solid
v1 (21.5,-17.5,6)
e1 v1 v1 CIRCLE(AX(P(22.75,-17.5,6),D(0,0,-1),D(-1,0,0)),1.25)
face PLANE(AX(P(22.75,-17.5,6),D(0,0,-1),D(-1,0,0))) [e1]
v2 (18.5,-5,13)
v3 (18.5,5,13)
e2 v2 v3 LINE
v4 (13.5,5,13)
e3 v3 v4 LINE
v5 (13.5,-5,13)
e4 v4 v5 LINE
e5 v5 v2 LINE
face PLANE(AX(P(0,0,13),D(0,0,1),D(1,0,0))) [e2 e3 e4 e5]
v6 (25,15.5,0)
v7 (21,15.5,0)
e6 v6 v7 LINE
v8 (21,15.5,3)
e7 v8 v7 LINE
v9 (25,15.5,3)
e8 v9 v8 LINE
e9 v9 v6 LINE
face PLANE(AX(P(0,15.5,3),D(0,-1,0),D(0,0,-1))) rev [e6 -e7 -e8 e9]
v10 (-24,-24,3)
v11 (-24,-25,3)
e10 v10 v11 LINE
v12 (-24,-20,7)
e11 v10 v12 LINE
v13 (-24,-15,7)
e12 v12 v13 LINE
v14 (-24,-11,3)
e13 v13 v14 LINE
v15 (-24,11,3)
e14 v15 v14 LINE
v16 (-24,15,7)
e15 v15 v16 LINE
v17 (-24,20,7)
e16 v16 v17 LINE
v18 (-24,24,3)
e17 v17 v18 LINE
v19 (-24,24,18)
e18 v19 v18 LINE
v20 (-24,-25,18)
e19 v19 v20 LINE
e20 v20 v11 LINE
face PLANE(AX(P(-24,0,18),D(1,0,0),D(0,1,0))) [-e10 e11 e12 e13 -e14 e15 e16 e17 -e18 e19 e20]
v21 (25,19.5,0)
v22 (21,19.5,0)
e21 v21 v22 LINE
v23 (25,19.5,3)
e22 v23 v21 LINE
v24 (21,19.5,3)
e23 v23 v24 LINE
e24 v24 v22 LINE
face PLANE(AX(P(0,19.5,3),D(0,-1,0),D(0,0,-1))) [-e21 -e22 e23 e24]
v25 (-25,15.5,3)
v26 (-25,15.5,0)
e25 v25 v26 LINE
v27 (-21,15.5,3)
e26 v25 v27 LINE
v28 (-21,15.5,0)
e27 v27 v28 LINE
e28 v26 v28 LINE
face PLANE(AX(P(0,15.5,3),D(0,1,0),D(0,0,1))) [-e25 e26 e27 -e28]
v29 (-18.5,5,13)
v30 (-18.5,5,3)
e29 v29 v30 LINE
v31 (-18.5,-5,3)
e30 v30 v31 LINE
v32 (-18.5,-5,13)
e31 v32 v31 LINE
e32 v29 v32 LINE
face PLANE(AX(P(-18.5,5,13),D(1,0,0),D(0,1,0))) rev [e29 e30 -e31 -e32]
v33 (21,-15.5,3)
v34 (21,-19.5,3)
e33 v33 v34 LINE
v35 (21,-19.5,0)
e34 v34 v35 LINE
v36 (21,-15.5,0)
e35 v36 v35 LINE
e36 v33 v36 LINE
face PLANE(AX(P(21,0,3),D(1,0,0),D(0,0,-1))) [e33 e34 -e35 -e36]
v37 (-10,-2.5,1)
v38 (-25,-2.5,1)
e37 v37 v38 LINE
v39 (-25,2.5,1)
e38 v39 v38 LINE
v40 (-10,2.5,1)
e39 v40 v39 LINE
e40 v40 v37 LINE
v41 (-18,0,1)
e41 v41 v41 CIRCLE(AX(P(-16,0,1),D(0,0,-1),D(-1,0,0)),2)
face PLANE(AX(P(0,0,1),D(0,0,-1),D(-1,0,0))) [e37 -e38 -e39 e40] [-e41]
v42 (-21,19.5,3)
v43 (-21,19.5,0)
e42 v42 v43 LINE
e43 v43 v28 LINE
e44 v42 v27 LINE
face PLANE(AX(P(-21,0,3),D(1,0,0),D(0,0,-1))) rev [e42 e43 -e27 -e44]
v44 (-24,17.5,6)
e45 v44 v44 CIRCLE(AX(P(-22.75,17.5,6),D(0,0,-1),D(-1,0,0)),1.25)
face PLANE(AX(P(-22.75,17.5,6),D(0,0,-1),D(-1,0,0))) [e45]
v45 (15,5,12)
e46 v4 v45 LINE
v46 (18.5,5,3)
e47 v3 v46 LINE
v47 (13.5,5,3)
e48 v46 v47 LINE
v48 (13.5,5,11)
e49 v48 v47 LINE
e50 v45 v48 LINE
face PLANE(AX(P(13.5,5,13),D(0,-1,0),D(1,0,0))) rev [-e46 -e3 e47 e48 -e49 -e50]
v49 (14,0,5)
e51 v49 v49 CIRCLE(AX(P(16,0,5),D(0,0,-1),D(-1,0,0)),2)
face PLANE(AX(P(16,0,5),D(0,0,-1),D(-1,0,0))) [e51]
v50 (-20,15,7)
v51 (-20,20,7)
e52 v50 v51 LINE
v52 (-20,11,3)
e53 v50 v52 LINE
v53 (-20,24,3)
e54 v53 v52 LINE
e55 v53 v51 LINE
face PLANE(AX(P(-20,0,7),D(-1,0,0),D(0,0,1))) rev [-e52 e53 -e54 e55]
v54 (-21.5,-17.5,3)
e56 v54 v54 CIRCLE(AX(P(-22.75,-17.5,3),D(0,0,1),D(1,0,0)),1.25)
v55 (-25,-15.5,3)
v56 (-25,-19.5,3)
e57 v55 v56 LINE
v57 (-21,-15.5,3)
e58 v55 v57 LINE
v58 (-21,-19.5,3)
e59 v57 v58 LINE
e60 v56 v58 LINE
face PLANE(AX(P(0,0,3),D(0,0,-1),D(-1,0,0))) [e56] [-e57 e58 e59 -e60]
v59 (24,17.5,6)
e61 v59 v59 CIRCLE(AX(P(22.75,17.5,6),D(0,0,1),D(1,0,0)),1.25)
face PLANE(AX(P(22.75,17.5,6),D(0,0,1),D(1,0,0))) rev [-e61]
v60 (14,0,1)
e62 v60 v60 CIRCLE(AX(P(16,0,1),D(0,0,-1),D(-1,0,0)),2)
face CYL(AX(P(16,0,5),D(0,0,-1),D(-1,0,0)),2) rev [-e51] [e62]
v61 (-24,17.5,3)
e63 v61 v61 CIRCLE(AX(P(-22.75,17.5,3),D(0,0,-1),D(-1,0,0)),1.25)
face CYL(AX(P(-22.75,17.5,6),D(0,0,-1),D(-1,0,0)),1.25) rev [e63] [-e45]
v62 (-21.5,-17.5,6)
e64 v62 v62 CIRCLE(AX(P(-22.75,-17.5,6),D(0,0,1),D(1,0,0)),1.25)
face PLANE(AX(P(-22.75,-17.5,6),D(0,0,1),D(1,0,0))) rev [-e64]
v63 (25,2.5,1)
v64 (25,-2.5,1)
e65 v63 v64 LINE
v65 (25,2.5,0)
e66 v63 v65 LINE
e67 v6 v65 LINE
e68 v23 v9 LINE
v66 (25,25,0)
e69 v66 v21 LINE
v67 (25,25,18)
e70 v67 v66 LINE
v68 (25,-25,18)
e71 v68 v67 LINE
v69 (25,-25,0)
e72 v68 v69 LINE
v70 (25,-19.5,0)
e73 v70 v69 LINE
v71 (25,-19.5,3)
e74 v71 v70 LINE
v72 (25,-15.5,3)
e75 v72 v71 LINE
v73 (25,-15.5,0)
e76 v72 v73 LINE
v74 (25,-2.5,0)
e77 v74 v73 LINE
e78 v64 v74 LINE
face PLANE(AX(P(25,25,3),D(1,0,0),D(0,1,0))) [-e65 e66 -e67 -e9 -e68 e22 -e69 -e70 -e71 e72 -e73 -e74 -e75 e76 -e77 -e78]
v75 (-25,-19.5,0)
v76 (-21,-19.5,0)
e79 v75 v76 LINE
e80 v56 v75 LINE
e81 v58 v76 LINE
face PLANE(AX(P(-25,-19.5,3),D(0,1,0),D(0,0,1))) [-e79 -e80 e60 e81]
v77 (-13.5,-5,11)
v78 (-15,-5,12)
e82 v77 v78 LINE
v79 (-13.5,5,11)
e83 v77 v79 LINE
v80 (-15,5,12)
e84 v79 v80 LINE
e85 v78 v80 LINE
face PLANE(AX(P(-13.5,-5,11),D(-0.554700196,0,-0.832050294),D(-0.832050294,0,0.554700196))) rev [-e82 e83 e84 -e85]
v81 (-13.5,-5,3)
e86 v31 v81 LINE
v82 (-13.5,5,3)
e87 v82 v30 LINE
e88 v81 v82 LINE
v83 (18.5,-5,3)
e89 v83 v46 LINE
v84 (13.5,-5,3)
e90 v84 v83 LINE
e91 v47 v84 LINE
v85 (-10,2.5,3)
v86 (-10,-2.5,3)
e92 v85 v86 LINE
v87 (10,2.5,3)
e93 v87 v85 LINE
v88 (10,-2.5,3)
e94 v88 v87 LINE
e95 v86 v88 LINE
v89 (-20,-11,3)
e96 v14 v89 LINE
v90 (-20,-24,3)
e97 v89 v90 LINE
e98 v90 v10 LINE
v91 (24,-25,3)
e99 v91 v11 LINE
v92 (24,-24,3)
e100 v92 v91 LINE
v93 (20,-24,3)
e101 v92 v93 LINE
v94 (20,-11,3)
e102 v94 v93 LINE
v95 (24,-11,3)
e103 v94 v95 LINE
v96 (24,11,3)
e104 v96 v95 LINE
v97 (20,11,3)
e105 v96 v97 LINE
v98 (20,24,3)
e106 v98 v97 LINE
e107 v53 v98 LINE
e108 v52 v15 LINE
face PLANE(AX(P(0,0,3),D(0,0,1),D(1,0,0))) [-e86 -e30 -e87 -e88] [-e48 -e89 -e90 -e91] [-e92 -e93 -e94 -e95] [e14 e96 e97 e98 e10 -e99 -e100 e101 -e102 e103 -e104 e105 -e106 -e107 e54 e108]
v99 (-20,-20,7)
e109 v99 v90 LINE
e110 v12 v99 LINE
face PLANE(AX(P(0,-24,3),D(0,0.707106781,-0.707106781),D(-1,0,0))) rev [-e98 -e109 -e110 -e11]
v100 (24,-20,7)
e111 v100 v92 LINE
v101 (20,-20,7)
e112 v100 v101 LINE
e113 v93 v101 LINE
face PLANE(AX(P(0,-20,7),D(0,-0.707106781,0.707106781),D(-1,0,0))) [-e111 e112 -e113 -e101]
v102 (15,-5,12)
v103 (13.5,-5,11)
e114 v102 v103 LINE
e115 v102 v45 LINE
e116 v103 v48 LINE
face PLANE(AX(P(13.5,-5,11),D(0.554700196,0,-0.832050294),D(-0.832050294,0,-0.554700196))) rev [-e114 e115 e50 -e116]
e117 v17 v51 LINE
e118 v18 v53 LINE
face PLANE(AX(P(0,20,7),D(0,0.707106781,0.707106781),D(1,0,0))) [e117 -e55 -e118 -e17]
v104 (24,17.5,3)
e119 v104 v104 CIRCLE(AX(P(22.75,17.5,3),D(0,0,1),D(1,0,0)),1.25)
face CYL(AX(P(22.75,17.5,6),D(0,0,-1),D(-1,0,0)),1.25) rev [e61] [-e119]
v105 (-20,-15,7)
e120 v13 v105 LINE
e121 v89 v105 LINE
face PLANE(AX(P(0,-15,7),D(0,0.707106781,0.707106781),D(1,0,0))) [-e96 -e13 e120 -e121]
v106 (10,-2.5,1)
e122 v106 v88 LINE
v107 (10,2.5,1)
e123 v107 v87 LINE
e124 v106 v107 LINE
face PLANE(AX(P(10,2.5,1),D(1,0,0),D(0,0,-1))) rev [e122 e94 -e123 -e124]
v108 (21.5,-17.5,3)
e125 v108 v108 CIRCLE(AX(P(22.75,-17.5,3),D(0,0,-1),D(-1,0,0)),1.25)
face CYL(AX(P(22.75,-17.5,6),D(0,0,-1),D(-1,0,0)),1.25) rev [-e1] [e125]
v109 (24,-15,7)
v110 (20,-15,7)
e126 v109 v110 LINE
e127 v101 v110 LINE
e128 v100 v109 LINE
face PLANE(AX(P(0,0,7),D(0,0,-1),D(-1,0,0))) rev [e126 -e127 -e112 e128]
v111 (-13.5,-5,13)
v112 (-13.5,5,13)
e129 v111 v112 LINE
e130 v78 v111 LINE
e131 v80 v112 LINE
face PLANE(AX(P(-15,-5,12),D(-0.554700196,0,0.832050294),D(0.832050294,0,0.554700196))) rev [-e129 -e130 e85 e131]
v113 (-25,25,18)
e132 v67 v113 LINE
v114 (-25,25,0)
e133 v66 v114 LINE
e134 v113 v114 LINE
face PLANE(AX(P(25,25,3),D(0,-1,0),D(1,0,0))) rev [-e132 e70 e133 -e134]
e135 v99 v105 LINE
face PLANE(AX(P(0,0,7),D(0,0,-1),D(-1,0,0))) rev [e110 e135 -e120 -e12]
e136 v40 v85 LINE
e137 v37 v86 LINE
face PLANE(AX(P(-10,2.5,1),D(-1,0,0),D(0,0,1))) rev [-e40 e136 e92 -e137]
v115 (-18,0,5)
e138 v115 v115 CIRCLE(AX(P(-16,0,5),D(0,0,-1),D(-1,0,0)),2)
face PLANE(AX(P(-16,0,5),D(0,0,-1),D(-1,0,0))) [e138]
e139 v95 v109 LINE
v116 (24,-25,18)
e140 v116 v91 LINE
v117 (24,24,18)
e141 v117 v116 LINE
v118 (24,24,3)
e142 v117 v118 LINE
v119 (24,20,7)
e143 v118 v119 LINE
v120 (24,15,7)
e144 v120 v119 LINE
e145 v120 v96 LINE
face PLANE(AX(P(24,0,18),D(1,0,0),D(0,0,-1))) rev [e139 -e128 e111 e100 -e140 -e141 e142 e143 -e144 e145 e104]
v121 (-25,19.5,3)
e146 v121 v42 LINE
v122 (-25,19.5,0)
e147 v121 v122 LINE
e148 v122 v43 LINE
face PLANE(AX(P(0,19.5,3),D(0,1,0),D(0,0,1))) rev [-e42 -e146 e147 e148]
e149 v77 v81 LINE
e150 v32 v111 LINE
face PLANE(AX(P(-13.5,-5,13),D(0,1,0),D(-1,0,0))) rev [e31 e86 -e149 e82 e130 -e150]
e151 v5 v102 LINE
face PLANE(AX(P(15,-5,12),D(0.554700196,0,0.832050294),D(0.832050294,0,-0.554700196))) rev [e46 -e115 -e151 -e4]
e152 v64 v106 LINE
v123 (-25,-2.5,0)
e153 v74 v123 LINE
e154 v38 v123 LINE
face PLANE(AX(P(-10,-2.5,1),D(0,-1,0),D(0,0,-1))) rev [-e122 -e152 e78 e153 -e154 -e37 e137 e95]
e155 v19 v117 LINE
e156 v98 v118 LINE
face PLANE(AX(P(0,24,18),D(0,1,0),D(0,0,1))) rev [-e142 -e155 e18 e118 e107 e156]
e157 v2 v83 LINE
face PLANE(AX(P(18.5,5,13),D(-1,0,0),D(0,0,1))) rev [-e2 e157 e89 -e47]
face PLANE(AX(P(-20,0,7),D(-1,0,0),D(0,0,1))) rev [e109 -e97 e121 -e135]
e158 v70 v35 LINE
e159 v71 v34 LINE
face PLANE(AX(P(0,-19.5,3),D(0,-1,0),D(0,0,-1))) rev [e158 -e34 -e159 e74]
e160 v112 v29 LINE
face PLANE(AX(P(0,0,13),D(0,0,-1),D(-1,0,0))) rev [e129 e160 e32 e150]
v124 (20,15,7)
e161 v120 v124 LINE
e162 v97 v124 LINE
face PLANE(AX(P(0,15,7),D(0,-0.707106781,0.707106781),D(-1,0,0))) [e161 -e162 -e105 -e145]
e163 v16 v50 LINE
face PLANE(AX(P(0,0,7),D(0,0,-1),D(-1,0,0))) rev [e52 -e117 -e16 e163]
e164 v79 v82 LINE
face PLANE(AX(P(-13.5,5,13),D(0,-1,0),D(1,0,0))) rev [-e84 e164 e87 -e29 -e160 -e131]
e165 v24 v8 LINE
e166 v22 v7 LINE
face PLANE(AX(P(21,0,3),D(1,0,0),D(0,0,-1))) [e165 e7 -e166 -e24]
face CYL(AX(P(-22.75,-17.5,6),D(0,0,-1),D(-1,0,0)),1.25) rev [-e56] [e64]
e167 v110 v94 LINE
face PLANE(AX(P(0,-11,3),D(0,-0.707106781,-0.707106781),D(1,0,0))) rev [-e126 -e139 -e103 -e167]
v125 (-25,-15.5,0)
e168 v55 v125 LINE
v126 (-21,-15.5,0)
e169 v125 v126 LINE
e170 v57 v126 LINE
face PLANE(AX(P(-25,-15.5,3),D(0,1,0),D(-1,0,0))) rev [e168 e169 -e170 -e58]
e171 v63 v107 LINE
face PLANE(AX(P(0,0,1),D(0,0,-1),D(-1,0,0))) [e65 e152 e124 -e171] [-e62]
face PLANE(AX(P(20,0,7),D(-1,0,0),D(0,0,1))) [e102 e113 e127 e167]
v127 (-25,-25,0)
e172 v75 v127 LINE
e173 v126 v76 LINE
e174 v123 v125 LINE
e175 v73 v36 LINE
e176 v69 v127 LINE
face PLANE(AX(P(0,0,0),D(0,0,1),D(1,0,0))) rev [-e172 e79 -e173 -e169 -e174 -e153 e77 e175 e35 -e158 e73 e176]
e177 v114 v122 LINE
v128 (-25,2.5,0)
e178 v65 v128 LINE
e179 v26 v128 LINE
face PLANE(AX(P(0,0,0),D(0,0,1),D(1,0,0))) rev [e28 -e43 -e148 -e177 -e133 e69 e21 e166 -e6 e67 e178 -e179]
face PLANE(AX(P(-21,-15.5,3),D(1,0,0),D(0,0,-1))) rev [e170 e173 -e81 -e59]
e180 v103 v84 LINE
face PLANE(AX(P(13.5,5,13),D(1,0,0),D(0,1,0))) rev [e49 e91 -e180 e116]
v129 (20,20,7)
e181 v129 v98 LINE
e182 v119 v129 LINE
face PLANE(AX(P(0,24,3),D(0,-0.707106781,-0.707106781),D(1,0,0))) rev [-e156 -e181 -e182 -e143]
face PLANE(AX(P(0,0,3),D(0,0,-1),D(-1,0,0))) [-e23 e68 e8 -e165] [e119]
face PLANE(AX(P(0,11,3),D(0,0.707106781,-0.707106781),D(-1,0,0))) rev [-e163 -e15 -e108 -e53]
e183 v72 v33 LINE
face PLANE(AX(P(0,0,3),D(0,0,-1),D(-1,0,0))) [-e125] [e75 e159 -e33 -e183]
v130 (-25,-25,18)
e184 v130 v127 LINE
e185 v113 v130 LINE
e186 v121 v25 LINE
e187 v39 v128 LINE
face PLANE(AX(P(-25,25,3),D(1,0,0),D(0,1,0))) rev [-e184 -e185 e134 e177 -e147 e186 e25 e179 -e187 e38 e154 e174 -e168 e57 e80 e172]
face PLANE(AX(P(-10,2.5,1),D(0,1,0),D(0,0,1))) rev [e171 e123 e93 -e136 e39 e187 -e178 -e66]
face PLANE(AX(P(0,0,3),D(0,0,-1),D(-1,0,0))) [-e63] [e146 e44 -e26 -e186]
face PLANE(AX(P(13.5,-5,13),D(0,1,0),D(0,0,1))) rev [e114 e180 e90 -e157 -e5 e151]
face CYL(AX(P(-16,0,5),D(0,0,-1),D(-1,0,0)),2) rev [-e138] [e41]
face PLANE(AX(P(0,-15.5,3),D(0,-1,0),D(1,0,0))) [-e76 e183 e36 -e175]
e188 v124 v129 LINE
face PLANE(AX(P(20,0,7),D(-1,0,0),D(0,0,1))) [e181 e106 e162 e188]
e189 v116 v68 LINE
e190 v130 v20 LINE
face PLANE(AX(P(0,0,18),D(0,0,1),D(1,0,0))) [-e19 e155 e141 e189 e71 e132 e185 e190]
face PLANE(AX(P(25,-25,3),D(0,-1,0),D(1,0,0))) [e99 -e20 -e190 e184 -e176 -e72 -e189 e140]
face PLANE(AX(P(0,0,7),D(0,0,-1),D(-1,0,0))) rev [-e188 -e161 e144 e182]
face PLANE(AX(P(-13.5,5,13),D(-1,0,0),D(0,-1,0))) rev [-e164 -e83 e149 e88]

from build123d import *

# Parameters (mm, degrees)
SKICA1_W                  = 50
SKICA1_H                  = 50
P_IDAT_VYSUNUT_M2_DEPTH   = 3
SKICA4_W                  = 20
SKICA4_H                  = 5
ODEBRAT_VYSUNUT_M1_DEPTH  = 2
SKICA5_W                  = 50
SKICA5_H                  = 5
ODEBRAT_VYSUNUT_M3_DEPTH  = 1
SKICA10_W                 = 5
SKICA10_H                 = 10
P_IDAT_VYSUNUT_M6_DEPTH   = 10
ODEBRAT_VYSUNUT_M6_DEPTH  = 10
P_IDAT_VYSUNUT_M9_DEPTH   = 15
SKICA17_R                 = 2
ODEBRAT_VYSUNUT_M8_DEPTH  = 4
SKICA18_W                 = 5
SKICA18_H                 = 5
P_IDAT_VYSUNUT_M10_DEPTH  = 7
SKICA19_W                 = 4
SKICA19_H                 = 4
ODEBRAT_VYSUNUT_M10_DEPTH = 3
ZKOSEN_2_SIZE             = 4
SKICA20_R                 = 1.25
ODEBRAT_VYSUNUT_M11_DEPTH = 3


with BuildPart() as part:
    # Skica1 → Přidat vysunutím2 (new body)
    with BuildSketch(Plane.XY):
        Rectangle(SKICA1_W, SKICA1_H)
    extrude(amount=P_IDAT_VYSUNUT_M2_DEPTH)

    # Skica4 → Odebrat vysunutím1 (cut)
    with BuildSketch(Plane.XY.offset(3)):
        Rectangle(SKICA4_W, SKICA4_H)
    extrude(amount=-ODEBRAT_VYSUNUT_M1_DEPTH, mode=Mode.SUBTRACT)

    # Skica5 → Odebrat vysunutím3 (cut)
    with BuildSketch(Plane(origin=(0, 0, 0), x_dir=(-1, 0, 0), z_dir=(0, 0, -1))):
        Rectangle(SKICA5_W, SKICA5_H)
    extrude(amount=-ODEBRAT_VYSUNUT_M3_DEPTH, mode=Mode.SUBTRACT)

    # Skica10 → Přidat vysunutím6 (add)
    with BuildSketch(Plane.XY.offset(3)):
        with Locations((-16, 0)):
            Rectangle(SKICA10_W, SKICA10_H)
        with Locations((16, 0)):
            Rectangle(SKICA10_W, SKICA10_H)
    extrude(amount=P_IDAT_VYSUNUT_M6_DEPTH)

    # Skica12 → Odebrat vysunutím6 (cut)
    with BuildSketch(Plane(origin=(0, 5, 0), x_dir=(1, 0, 0), z_dir=(0, 1, 0))):
        Polygon((-13.5, -13), (-13.5, -11), (-15, -12), align=None)
        Polygon((13.5, -13), (13.5, -11), (15, -12), align=None)
    extrude(amount=-ODEBRAT_VYSUNUT_M6_DEPTH, mode=Mode.SUBTRACT)

    # Skica14 → Přidat vysunutím9 (add)
    with BuildSketch(Plane.XY.offset(3)):
        Polygon((25, 25), (-25, 25), (-25, -25), (-24, -25), (-24, 24), (24, 24), (24, -25), (25, -25), align=None)
    extrude(amount=P_IDAT_VYSUNUT_M9_DEPTH)

    # Skica17 → Odebrat vysunutím8 (cut)
    with BuildSketch(Plane(origin=(0, 0, 1), x_dir=(-1, 0, 0), z_dir=(0, 0, -1))):
        with Locations((-16, 0)):
            Circle(SKICA17_R)
        with Locations((16, 0)):
            Circle(SKICA17_R)
    extrude(amount=-ODEBRAT_VYSUNUT_M8_DEPTH, mode=Mode.SUBTRACT)

    # Skica18 → Přidat vysunutím10 (add)
    with BuildSketch(Plane(origin=(0, 0, 0), x_dir=(-1, 0, 0), z_dir=(0, 0, -1))):
        with Locations((-22.5, 17.5)):
            Rectangle(SKICA18_W, SKICA18_H)
        with Locations((22.5, 17.5)):
            Rectangle(SKICA18_W, SKICA18_H)
        with Locations((22.5, -17.5)):
            Rectangle(SKICA18_W, SKICA18_H)
        with Locations((-22.5, -17.5)):
            Rectangle(SKICA18_W, SKICA18_H)
    extrude(amount=-P_IDAT_VYSUNUT_M10_DEPTH)

    # Skica19 → Odebrat vysunutím10 (cut)
    with BuildSketch(Plane(origin=(0, 0, 0), x_dir=(-1, 0, 0), z_dir=(0, 0, -1))):
        with Locations((-23, -17.5)):
            Rectangle(SKICA19_W, SKICA19_H)
        with Locations((-23, 17.5)):
            Rectangle(SKICA19_W, SKICA19_H)
        with Locations((23, 17.5)):
            Rectangle(SKICA19_W, SKICA19_H)
        with Locations((23, -17.5)):
            Rectangle(SKICA19_W, SKICA19_H)
    extrude(amount=-ODEBRAT_VYSUNUT_M10_DEPTH, mode=Mode.SUBTRACT)

    # Zkosení2
    zkosen_2_edges = [part.edges().sort_by_distance(p)[0] for p in [
        (22, 15, 3),
        (22, 20, 3),
        (-22, 20, 3),
        (-22, 15, 3),
        (-22, -15, 3),
        (-22, -20, 3),
        (22, -20, 3),
        (22, -15, 3),
    ]]
    chamfer(zkosen_2_edges, length=ZKOSEN_2_SIZE - 0.0001)  # a hair under: the kernel refuses the full size

    # Skica20 → Odebrat vysunutím11 (cut)
    with BuildSketch(Plane(origin=(0, 0, 3), x_dir=(-1, 0, 0), z_dir=(0, 0, -1))):
        with Locations((22.75, 17.5)):
            Circle(SKICA20_R)
        with Locations(Location((22.75, -17.5, 0), (0, 0, 180))):
            Circle(SKICA20_R)
        with Locations((-22.75, -17.5)):
            Circle(SKICA20_R)
        with Locations(Location((-22.75, 17.5, 0), (0, 0, 180))):
            Circle(SKICA20_R)
    extrude(amount=-ODEBRAT_VYSUNUT_M11_DEPTH, mode=Mode.SUBTRACT)


solid = part.part
